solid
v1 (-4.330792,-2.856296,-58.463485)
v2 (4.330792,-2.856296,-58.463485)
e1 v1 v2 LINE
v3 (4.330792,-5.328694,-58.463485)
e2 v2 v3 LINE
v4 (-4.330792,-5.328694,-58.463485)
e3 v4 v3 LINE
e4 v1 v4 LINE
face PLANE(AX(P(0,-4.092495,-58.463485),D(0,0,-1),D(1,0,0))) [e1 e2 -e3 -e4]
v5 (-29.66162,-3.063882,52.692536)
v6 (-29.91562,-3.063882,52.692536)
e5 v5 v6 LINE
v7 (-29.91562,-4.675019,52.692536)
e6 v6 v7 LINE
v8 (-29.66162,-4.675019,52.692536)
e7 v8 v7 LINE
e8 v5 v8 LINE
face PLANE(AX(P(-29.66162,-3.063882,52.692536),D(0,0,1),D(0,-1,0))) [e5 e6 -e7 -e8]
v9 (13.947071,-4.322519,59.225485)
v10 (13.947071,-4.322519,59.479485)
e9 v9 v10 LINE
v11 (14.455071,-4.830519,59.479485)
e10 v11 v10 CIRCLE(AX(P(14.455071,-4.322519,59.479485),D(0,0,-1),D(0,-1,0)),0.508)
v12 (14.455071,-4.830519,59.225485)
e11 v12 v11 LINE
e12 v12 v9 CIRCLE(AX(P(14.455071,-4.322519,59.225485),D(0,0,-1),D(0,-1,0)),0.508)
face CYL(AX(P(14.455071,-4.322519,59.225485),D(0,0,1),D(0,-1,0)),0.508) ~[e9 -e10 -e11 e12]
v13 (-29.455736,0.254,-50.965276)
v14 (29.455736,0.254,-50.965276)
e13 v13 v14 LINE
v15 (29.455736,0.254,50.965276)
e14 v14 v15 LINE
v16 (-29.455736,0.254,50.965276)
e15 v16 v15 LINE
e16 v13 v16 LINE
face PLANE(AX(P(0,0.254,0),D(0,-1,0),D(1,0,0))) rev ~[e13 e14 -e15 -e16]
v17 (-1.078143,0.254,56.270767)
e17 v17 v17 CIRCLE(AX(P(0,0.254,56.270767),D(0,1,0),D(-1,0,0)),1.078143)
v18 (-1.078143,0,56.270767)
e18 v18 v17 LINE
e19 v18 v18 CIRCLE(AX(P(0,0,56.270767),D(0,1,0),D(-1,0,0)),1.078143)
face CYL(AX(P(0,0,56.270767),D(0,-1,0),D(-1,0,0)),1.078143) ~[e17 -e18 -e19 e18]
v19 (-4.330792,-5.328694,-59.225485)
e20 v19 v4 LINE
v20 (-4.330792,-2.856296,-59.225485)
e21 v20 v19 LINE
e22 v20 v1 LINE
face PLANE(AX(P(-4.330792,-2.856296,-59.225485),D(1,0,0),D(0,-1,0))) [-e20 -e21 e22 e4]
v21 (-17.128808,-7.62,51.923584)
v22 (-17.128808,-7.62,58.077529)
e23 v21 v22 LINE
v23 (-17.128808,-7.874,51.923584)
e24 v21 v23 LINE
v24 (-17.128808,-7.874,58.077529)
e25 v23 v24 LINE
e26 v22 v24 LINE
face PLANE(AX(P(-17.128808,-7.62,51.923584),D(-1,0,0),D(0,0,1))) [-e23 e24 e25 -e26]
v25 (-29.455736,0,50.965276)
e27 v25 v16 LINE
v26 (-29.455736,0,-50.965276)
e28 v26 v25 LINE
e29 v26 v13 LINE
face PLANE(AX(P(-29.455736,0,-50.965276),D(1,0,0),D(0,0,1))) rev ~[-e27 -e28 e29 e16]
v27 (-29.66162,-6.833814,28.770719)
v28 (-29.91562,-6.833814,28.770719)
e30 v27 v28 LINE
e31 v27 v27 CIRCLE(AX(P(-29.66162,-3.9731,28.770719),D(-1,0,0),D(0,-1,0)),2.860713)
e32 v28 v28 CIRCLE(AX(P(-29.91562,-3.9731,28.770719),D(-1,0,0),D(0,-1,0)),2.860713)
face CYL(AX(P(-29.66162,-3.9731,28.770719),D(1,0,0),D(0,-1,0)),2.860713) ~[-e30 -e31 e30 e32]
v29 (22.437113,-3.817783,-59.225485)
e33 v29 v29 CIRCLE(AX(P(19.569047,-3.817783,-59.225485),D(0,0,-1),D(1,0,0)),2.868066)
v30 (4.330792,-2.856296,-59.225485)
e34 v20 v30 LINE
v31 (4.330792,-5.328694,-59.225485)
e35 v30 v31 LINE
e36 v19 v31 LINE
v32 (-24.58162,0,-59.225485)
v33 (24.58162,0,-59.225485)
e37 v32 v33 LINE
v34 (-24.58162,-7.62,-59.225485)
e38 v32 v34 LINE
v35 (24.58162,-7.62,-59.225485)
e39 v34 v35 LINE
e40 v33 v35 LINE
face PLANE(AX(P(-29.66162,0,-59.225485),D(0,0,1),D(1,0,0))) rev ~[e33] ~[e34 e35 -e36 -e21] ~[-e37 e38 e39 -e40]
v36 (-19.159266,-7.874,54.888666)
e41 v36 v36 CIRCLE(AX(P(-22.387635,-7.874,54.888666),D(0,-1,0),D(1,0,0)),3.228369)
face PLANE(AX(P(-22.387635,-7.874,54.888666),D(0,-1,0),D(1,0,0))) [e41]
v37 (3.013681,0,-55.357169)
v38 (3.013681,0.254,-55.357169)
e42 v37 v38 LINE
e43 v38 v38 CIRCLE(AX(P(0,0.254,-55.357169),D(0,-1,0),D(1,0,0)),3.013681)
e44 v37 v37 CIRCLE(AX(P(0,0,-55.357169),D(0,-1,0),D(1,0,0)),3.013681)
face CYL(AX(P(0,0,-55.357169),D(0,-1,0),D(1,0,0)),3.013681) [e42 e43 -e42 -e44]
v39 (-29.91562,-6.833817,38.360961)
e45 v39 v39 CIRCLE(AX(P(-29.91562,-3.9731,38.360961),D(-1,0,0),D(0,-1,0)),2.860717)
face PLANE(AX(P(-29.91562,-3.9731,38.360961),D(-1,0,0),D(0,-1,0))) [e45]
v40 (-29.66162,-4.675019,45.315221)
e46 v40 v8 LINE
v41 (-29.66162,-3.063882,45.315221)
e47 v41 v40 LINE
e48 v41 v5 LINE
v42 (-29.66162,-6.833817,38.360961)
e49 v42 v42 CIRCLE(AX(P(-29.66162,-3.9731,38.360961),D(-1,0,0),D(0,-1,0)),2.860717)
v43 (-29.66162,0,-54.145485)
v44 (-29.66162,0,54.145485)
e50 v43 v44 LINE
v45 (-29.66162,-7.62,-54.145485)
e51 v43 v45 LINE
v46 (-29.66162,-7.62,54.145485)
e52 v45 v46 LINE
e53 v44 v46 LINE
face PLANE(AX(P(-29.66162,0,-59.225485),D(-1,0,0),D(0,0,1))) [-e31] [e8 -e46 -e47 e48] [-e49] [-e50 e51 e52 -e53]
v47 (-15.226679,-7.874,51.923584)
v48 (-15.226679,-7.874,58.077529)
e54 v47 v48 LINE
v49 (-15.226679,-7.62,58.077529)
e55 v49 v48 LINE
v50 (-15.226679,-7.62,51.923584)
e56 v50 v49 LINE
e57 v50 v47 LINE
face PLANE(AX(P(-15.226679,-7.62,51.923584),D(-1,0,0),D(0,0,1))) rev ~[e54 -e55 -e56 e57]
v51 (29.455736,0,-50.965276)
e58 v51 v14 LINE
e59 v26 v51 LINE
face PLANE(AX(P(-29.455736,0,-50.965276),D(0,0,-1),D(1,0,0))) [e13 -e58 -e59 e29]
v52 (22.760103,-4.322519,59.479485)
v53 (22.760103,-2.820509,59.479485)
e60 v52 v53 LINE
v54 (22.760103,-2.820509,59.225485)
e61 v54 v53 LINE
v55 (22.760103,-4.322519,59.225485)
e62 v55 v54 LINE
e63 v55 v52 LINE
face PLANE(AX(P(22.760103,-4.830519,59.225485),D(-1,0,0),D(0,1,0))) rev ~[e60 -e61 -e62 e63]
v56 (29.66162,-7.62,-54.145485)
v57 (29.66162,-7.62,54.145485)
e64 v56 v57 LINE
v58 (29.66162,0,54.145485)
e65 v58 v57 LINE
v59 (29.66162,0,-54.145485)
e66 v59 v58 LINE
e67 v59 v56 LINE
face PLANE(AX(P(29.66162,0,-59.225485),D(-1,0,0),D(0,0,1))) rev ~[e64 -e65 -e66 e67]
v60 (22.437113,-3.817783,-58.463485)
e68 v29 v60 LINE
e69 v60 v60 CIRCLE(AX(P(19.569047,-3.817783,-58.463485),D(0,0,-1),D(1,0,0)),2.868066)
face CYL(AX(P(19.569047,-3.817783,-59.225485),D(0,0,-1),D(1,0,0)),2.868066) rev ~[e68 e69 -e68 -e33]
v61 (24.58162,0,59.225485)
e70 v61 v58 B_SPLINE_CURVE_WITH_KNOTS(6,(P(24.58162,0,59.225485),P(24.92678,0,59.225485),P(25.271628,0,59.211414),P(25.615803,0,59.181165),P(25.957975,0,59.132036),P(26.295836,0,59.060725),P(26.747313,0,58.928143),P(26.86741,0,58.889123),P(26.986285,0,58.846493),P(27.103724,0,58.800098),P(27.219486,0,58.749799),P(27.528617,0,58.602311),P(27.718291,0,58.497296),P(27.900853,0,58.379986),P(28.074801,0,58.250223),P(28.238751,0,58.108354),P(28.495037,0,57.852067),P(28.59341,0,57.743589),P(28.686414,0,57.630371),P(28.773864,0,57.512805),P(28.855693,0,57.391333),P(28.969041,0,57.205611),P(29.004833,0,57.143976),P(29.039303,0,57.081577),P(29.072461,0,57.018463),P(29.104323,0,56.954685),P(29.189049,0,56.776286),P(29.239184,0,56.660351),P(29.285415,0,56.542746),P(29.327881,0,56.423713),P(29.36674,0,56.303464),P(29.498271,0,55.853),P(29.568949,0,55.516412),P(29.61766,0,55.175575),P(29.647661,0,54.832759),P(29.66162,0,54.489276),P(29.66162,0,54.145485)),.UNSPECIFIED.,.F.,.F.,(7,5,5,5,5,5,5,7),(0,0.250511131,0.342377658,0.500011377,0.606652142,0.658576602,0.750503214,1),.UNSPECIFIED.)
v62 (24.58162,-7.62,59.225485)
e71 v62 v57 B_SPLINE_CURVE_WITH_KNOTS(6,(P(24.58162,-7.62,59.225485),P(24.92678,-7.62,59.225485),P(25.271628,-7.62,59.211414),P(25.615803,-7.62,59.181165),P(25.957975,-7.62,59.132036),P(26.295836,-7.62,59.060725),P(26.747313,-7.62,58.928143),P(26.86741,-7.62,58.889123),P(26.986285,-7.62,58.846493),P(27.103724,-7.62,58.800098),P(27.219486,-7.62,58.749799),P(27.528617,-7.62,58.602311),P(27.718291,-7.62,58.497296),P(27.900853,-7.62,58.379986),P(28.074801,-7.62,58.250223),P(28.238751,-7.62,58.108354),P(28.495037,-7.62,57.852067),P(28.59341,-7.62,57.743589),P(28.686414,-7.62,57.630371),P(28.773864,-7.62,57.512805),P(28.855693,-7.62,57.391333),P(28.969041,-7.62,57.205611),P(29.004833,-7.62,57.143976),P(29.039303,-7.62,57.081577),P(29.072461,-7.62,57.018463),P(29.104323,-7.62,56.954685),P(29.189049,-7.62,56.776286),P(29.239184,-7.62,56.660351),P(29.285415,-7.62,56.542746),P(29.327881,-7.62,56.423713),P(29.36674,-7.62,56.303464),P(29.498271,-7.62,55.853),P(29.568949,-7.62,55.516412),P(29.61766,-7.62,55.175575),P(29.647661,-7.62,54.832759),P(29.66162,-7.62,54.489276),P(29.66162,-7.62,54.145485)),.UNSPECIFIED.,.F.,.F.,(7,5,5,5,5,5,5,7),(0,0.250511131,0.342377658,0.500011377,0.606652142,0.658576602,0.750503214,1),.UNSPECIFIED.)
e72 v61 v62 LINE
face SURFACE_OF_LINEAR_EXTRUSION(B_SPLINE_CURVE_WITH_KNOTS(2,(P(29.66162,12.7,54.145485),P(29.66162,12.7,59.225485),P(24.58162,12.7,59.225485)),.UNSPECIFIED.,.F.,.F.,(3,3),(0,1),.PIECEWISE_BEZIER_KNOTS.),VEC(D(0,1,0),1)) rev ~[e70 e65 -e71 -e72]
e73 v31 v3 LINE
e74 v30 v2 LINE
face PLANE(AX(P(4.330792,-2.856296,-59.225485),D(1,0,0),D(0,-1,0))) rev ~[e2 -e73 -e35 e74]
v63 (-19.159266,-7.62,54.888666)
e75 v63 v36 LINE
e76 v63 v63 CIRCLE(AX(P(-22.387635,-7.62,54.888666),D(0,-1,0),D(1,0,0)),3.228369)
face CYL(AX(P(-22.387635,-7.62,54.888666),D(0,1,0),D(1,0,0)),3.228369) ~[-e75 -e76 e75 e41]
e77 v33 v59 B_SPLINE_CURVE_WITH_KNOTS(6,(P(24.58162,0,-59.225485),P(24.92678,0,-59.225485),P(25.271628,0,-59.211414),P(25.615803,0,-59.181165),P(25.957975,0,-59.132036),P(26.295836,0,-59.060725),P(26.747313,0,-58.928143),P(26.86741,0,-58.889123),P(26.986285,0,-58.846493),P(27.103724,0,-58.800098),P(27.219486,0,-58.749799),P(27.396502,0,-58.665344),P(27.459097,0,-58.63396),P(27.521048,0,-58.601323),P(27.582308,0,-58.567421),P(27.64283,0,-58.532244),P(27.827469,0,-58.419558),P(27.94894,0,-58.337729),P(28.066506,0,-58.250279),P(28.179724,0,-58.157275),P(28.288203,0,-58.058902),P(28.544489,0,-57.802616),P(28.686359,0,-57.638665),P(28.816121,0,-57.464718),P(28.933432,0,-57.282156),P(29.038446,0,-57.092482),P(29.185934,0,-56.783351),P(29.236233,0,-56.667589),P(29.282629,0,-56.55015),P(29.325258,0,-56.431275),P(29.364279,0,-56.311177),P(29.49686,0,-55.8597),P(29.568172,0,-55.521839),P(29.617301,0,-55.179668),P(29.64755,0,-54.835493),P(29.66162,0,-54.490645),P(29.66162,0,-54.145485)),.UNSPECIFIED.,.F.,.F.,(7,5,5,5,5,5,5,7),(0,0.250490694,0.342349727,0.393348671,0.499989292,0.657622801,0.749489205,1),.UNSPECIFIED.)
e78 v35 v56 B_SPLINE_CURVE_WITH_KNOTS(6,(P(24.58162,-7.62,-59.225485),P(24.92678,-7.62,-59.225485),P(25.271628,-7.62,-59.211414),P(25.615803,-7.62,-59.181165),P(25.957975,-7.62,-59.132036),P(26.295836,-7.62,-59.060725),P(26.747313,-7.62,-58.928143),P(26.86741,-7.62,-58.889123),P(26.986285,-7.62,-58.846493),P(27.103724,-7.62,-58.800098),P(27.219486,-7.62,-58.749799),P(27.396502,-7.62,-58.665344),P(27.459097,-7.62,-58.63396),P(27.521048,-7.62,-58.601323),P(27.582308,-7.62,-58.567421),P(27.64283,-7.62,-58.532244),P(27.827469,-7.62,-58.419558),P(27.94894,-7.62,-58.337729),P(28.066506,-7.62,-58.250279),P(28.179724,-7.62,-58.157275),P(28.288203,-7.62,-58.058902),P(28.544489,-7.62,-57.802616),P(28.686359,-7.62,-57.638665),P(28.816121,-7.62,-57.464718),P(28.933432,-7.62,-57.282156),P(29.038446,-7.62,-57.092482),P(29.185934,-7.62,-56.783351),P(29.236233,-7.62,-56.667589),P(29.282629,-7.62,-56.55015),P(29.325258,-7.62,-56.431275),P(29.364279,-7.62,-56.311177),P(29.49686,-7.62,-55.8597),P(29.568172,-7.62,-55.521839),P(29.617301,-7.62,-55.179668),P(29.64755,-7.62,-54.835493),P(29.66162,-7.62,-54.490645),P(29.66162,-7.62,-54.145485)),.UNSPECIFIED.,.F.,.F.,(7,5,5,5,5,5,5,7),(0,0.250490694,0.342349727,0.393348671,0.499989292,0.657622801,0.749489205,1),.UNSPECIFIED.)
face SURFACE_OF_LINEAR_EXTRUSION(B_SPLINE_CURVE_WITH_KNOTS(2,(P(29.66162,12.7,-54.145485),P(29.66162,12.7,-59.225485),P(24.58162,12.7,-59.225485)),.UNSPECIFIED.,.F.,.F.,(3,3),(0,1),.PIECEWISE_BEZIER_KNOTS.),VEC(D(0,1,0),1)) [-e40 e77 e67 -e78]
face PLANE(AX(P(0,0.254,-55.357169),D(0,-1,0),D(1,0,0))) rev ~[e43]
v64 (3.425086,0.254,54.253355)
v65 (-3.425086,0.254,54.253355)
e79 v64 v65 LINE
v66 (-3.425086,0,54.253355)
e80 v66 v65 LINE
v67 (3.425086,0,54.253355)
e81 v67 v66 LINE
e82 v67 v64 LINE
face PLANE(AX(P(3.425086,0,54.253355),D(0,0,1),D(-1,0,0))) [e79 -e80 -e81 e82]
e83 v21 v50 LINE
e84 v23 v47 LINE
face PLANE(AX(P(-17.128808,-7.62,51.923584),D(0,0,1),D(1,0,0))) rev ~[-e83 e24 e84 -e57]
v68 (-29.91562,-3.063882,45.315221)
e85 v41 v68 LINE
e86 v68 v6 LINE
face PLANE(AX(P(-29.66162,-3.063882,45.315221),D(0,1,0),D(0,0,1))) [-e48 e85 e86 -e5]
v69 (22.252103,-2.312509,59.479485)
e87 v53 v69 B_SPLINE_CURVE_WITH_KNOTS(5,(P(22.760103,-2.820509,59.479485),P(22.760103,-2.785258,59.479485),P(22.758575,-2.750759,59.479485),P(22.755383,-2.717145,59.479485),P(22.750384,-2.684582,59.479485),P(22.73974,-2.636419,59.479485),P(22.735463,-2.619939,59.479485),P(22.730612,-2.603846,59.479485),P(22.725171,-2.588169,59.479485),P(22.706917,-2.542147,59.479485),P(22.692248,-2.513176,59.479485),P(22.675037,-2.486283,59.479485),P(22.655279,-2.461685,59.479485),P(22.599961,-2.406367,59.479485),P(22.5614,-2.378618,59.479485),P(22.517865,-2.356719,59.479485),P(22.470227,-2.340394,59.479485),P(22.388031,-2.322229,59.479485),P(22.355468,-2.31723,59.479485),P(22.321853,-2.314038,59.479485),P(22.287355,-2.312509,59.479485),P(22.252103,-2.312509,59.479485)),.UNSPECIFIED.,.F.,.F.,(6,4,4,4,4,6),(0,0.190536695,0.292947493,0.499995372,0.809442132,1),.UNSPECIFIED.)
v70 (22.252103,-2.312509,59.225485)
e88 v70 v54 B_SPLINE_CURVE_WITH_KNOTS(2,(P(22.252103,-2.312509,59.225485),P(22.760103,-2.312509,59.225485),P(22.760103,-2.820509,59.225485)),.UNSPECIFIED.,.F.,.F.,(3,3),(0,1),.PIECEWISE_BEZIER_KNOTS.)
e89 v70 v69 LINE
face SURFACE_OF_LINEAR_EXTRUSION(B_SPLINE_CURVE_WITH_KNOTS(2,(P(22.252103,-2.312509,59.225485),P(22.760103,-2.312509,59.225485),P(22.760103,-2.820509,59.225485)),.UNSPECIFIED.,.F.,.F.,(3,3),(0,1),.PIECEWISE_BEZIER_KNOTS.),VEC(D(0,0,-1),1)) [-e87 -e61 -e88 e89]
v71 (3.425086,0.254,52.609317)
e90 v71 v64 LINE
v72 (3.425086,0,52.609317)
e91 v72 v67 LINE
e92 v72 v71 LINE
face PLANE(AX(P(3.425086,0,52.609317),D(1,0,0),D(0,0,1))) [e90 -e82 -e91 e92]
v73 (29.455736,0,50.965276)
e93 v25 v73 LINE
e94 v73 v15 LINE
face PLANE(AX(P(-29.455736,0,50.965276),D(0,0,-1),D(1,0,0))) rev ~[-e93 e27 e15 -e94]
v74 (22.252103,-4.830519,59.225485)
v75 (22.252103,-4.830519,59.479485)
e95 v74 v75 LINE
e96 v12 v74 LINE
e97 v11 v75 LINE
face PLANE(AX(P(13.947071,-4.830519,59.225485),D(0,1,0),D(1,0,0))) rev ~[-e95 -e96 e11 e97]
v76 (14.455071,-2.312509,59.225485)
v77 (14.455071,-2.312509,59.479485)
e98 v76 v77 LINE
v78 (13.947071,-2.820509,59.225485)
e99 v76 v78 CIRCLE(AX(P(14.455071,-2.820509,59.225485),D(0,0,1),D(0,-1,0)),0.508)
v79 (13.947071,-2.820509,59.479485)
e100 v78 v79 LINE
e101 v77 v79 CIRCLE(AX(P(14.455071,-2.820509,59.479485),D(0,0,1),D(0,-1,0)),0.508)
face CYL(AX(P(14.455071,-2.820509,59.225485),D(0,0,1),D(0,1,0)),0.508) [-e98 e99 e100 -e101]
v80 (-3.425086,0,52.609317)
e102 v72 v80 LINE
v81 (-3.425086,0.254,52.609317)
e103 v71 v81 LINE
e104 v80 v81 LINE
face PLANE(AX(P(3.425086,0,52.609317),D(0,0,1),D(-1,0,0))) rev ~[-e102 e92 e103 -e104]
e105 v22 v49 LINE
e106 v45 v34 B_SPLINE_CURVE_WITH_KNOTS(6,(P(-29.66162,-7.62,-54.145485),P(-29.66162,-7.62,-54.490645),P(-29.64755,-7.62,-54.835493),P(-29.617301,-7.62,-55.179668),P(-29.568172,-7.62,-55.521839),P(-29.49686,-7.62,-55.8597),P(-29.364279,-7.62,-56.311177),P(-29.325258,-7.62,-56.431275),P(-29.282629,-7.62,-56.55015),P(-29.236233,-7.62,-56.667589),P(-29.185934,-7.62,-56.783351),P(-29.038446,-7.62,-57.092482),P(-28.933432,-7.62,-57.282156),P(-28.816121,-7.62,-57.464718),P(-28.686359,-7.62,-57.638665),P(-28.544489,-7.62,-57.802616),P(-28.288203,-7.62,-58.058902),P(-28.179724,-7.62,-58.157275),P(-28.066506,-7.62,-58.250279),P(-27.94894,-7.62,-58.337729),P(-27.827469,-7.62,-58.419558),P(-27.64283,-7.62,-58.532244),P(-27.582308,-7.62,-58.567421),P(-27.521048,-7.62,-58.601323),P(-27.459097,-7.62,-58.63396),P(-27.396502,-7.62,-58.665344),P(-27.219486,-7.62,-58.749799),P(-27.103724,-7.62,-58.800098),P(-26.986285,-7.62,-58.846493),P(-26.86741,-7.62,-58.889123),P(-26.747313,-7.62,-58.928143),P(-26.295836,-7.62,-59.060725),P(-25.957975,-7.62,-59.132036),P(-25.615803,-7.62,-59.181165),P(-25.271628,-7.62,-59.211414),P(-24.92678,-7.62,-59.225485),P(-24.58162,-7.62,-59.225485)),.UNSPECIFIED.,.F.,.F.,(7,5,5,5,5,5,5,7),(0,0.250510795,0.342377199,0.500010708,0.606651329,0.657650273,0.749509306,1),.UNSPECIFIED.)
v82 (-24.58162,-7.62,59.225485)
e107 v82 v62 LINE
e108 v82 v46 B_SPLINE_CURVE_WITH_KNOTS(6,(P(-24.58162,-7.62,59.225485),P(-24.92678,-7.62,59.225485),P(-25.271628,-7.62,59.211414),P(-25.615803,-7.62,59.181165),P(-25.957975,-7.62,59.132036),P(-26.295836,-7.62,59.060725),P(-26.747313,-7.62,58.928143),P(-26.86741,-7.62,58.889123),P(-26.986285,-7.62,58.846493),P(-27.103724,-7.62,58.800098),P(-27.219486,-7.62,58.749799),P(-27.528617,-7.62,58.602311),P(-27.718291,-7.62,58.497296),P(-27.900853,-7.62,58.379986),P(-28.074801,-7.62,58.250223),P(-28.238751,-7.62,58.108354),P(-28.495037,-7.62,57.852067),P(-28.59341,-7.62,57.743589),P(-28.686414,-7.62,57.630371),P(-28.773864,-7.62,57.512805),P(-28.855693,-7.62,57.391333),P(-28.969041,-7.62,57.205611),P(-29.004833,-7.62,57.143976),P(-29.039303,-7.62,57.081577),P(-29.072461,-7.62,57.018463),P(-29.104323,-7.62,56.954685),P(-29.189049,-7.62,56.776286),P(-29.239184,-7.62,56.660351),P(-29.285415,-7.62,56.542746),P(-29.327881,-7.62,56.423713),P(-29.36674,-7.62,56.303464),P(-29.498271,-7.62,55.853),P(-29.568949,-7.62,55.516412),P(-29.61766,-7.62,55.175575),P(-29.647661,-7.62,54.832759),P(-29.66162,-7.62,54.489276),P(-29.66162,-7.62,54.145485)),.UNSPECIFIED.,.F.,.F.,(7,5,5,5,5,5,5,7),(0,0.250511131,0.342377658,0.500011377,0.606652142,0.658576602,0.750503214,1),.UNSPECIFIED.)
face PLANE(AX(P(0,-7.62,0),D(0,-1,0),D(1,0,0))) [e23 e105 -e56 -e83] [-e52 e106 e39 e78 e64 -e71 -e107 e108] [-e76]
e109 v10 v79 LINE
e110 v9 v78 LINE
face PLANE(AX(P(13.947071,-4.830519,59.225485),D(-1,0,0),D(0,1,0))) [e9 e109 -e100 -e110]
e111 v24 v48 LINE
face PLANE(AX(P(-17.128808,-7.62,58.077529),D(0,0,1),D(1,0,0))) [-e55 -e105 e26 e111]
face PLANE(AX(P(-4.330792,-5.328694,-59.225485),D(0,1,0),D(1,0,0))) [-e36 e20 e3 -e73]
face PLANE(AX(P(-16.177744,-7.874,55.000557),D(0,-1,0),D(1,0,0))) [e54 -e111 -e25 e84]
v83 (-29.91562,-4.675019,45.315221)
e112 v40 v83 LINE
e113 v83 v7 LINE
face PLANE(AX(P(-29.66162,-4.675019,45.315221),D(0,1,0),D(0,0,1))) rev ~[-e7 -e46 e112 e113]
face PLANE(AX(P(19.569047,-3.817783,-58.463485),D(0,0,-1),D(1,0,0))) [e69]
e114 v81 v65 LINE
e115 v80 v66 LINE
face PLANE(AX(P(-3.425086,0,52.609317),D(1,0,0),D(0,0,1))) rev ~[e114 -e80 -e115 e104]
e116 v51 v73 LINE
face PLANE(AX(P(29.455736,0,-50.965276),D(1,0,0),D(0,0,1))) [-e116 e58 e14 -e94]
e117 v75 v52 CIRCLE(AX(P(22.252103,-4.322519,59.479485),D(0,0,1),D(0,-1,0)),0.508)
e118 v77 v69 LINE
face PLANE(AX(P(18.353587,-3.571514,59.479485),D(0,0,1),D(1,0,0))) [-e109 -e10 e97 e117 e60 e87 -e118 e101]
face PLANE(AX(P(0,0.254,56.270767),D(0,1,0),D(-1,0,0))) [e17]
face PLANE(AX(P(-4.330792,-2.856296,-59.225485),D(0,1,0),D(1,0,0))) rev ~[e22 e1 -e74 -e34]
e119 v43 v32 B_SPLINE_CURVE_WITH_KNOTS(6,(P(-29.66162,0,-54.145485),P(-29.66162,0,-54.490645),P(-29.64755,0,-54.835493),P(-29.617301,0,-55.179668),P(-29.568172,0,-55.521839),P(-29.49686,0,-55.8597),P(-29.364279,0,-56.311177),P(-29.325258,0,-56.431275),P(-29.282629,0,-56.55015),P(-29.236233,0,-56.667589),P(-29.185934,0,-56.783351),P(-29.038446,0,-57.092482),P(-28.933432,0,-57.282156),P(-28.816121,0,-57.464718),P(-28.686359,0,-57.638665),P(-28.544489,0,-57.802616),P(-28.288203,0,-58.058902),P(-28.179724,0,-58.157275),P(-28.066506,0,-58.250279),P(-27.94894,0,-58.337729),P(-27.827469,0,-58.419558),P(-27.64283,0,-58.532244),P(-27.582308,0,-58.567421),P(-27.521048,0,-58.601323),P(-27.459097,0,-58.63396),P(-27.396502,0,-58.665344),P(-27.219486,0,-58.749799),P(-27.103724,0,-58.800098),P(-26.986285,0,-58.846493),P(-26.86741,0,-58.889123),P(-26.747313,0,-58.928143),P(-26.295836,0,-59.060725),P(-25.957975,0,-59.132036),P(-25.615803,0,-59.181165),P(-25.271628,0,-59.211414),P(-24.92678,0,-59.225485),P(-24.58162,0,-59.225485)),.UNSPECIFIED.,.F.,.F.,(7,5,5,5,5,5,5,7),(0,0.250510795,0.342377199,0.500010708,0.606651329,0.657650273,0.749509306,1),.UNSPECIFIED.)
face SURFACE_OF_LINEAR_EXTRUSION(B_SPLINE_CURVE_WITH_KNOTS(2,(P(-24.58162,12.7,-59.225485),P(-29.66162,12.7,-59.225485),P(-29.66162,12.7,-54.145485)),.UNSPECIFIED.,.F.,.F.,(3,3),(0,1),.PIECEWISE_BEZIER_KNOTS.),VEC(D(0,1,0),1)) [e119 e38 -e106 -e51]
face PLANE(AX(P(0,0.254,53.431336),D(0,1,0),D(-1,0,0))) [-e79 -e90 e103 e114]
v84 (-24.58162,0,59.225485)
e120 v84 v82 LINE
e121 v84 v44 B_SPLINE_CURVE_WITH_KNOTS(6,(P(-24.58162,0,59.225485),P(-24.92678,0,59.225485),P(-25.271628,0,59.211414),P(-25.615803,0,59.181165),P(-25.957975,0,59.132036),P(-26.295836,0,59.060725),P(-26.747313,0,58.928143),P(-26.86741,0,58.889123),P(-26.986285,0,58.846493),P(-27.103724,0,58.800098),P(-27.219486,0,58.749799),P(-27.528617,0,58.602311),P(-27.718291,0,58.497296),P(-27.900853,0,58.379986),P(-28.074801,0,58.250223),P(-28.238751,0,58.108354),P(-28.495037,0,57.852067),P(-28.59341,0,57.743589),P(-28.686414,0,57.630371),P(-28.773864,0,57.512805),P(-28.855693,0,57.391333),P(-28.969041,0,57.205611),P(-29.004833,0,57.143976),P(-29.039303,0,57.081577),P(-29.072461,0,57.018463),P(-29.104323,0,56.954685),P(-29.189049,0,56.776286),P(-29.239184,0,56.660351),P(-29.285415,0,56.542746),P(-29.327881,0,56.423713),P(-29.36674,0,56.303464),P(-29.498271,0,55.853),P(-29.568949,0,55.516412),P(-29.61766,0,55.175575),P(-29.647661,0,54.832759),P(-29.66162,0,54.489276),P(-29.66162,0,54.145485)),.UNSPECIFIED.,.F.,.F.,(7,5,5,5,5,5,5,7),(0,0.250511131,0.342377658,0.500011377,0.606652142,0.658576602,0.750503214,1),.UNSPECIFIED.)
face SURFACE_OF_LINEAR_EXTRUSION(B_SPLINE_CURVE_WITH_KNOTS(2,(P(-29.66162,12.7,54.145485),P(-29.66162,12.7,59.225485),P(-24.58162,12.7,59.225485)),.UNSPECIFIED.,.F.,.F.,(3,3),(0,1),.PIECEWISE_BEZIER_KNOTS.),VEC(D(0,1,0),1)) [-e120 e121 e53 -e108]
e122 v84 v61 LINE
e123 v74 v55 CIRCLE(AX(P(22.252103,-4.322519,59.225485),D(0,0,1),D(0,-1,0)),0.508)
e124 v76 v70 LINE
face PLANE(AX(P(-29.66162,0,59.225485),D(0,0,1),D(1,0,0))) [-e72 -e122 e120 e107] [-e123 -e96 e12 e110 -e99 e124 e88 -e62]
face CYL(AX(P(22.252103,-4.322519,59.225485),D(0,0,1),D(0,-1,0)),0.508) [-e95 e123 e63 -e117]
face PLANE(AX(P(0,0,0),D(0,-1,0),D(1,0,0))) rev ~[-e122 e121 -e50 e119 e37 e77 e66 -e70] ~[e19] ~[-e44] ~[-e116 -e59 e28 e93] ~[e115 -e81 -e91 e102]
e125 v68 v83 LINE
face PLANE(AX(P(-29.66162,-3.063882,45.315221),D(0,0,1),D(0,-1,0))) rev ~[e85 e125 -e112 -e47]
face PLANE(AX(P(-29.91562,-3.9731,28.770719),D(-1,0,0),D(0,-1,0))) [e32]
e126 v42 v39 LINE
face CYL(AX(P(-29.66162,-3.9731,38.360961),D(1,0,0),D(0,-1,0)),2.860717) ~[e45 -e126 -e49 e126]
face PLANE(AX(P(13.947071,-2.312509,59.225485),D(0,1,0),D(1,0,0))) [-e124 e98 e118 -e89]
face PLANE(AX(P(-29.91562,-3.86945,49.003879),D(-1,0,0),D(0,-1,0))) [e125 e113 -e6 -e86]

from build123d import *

# Parameters (mm, degrees)
F0_W         = 59.3232400715
F0_H         = 118.4509694576
F1_DEPTH     = 7.62
F2_T1_DEPTH  = 33.02
F3_T1_DEPTH  = 33.02
F4_T1_DEPTH  = 33.02
F5_T1_DEPTH  = 33.02
F17_W        = 8.8130328804
F17_H        = 2.5180093944
F18_DEPTH    = 0.254
F19_T1_DEPTH = 1.524
F20_R        = 0.508
F10_R        = 2.8607169915
F21_DEPTH    = 0.254
F11_R        = 2.8607134233
F22_DEPTH    = 0.254
F12_W        = 1.611137297
F12_H        = 7.3773153126
F23_DEPTH    = 0.254
F7_R         = 1.0781434008
F24_DEPTH    = 0.254
F9_W         = 6.8501718342
F9_H         = 1.6440376639
F25_DEPTH    = 0.254
F13_R        = 3.228368755
F26_DEPTH    = 0.254
F14_W        = 1.9021295011
F14_H        = 6.1539448798
F27_DEPTH    = 0.254
F8_R         = 3.0136808832
F28_DEPTH    = 0.254
F6_W         = 58.911472559
F6_H         = 101.9305512309
F29_DEPTH    = 0.254
F16_W        = 8.6615839973
F16_H        = 2.4723988026
F30_DEPTH    = 0.762
F15_R        = 2.8680658163
F31_DEPTH    = 0.762


# Not quite as in the source:
# - a fillet or chamfer that OpenCascade refuses, or shapes differently, is made with other operations: its cross-section is extruded or revolved along the edge and cut away or added


with BuildPart() as f1:
    # F0 (on Front) → F1 (new body)
    with BuildSketch(Plane.XZ):
        Rectangle(F0_W, F0_H)
    extrude(amount=F1_DEPTH)

    # F2: fillet of radius 5.08 on 1 edges, made by hand

    # F2_s2 → F2_t1 (cut)
    with BuildSketch(Plane.XZ.offset(-12.7)):
        with BuildLine():
            add(Edge.make_bspline(
                [(29.6616200358, 54.1454847288), (29.6616200358, 59.2254847288), (24.5816200358, 59.2254847288)],
                knots=[0, 0, 0, 1, 1, 1], degree=2, weights=[1, 1, 1]))
            Line((24.5816200358, 59.2254847288), (29.6616200358, 59.2254847288))
            Line((29.6616200358, 59.2254847288), (29.6616200358, 54.1454847288))
        make_face()
    extrude(amount=F2_T1_DEPTH, mode=Mode.SUBTRACT)

    # F3: fillet of radius 5.08 on 1 edges, made by hand

    # F3_s2 → F3_t1 (cut)
    with BuildSketch(Plane.XZ.offset(-12.7)):
        with BuildLine():
            add(Edge.make_bspline(
                [(-29.6616200358, 54.1454847288), (-29.6616200358, 59.2254847288), (-24.5816200358, 59.2254847288)],
                knots=[0, 0, 0, 1, 1, 1], degree=2, weights=[1, 1, 1]))
            Line((-24.5816200358, 59.2254847288), (-29.6616200358, 59.2254847288))
            Line((-29.6616200358, 59.2254847288), (-29.6616200358, 54.1454847288))
        make_face()
    extrude(amount=F3_T1_DEPTH, mode=Mode.SUBTRACT)

    # F4: fillet of radius 5.08 on 1 edges, made by hand

    # F4_s2 → F4_t1 (cut)
    with BuildSketch(Plane.XZ.offset(-12.7)):
        with BuildLine():
            add(Edge.make_bspline(
                [(-24.5816200358, -59.2254847288), (-29.6616200358, -59.2254847288), (-29.6616200358, -54.1454847288)],
                knots=[0, 0, 0, 1, 1, 1], degree=2, weights=[1, 1, 1]))
            Line((-29.6616200358, -54.1454847288), (-29.6616200358, -59.2254847288))
            Line((-29.6616200358, -59.2254847288), (-24.5816200358, -59.2254847288))
        make_face()
    extrude(amount=F4_T1_DEPTH, mode=Mode.SUBTRACT)

    # F5: fillet of radius 5.08 on 1 edges, made by hand

    # F5_s2 → F5_t1 (cut)
    with BuildSketch(Plane.XZ.offset(-12.7)):
        with BuildLine():
            add(Edge.make_bspline(
                [(29.6616200358, -54.1454847288), (29.6616200358, -59.2254847288), (24.5816200358, -59.2254847288)],
                knots=[0, 0, 0, 1, 1, 1], degree=2, weights=[1, 1, 1]))
            Line((24.5816200358, -59.2254847288), (29.6616200358, -59.2254847288))
            Line((29.6616200358, -59.2254847288), (29.6616200358, -54.1454847288))
        make_face()
    extrude(amount=F5_T1_DEPTH, mode=Mode.SUBTRACT)

    # F17 (on face) → F18 (join)
    with BuildSketch(Plane.XY.offset(59.2254847288)):
        with Locations((18.3535870165, -3.5715140402)):
            Rectangle(F17_W, F17_H)
    extrude(amount=F18_DEPTH)

    # F19: fillet of radius 0.508 on 1 edges, made by hand

    # F19_s2 → F19_t1 (cut)
    with BuildSketch(Plane.XY.offset(59.2254847288)):
        with BuildLine():
            add(Edge.make_bspline(
                [(22.2521034567, -2.312509343), (22.7601034567, -2.312509343), (22.7601034567, -2.820509343)],
                knots=[0, 0, 0, 1, 1, 1], degree=2, weights=[1, 1, 1]))
            Line((22.7601034567, -2.820509343), (22.7601034567, -2.312509343))
            Line((22.7601034567, -2.312509343), (22.2521034567, -2.312509343))
        make_face()
    extrude(amount=F19_T1_DEPTH, mode=Mode.SUBTRACT)

    # F20
    f20_edges = [f1.edges().sort_by_distance(p)[0] for p in [
        (13.947071, -2.312509, 59.352485),
        (22.760103, -4.830519, 59.352485),
        (13.947071, -4.830519, 59.352485),
    ]]
    fillet(f20_edges, radius=F20_R)

    # F10 (on face) → F21 (join)
    with BuildSketch(Plane(origin=(-29.6616200358, 0, 0), x_dir=(0, -1, 0), z_dir=(-1, 0, 0))):
        with Locations((3.9731003344, 38.3609607816)):
            Circle(F10_R)
    extrude(amount=F21_DEPTH)

    # F11 (on face) → F22 (join)
    with BuildSketch(Plane(origin=(-29.6616200358, 0, 0), x_dir=(0, -1, 0), z_dir=(-1, 0, 0))):
        with Locations((3.9731003344, 28.7707187235)):
            Circle(F11_R)
    extrude(amount=F22_DEPTH)

    # F12 (on face) → F23 (join)
    with BuildSketch(Plane(origin=(-29.6616200358, 0, 0), x_dir=(0, -1, 0), z_dir=(-1, 0, 0))):
        with Locations((3.8694504183, 49.0038786083)):
            Rectangle(F12_W, F12_H)
    extrude(amount=F23_DEPTH)

    # F7 (on face) → F24 (join)
    with BuildSketch(Plane(origin=(0, 0, 0), x_dir=(-1, 0, 0), z_dir=(0, 1, 0))):
        with Locations((0, 56.2707670033)):
            Circle(F7_R)
    extrude(amount=F24_DEPTH)

    # F9 (on face) → F25 (join)
    with BuildSketch(Plane(origin=(0, 0, 0), x_dir=(-1, 0, 0), z_dir=(0, 1, 0))):
        with Locations((0, 53.4313358366)):
            Rectangle(F9_W, F9_H)
    extrude(amount=F25_DEPTH)

    # F13 (on face) → F26 (join)
    with BuildSketch(Plane.XZ.offset(7.62)):
        with Locations((-22.3876349628, 54.8886656761)):
            Circle(F13_R)
    extrude(amount=F26_DEPTH)

    # F14 (on face) → F27 (join)
    with BuildSketch(Plane.XZ.offset(7.62)):
        with Locations((-16.1777436733, 55.0005566329)):
            Rectangle(F14_W, F14_H)
    extrude(amount=F27_DEPTH)

    # F8 (on Front) → F28 (join)
    with BuildSketch(Plane.XZ):
        with Locations((0, -55.3571693599)):
            Circle(F8_R)
    extrude(amount=-F28_DEPTH)

    # F6 (on Front) → F29 (join)
    with BuildSketch(Plane.XZ):
        Rectangle(F6_W, F6_H)
    extrude(amount=-F29_DEPTH)

    # F16 (on face) → F30 (cut)
    with BuildSketch(Plane(origin=(0, 0, -59.2254847288), x_dir=(1, 0, 0), z_dir=(0, 0, -1))):
        with Locations((0, 4.0924949571)):
            Rectangle(F16_W, F16_H)
    extrude(amount=-F30_DEPTH, mode=Mode.SUBTRACT)

    # F15 (on face) → F31 (cut)
    with BuildSketch(Plane(origin=(0, 0, -59.2254847288), x_dir=(1, 0, 0), z_dir=(0, 0, -1))):
        with Locations((19.5690467954, 3.8177834358)):
            Circle(F15_R)
    extrude(amount=-F31_DEPTH, mode=Mode.SUBTRACT)


solid = f1.part
